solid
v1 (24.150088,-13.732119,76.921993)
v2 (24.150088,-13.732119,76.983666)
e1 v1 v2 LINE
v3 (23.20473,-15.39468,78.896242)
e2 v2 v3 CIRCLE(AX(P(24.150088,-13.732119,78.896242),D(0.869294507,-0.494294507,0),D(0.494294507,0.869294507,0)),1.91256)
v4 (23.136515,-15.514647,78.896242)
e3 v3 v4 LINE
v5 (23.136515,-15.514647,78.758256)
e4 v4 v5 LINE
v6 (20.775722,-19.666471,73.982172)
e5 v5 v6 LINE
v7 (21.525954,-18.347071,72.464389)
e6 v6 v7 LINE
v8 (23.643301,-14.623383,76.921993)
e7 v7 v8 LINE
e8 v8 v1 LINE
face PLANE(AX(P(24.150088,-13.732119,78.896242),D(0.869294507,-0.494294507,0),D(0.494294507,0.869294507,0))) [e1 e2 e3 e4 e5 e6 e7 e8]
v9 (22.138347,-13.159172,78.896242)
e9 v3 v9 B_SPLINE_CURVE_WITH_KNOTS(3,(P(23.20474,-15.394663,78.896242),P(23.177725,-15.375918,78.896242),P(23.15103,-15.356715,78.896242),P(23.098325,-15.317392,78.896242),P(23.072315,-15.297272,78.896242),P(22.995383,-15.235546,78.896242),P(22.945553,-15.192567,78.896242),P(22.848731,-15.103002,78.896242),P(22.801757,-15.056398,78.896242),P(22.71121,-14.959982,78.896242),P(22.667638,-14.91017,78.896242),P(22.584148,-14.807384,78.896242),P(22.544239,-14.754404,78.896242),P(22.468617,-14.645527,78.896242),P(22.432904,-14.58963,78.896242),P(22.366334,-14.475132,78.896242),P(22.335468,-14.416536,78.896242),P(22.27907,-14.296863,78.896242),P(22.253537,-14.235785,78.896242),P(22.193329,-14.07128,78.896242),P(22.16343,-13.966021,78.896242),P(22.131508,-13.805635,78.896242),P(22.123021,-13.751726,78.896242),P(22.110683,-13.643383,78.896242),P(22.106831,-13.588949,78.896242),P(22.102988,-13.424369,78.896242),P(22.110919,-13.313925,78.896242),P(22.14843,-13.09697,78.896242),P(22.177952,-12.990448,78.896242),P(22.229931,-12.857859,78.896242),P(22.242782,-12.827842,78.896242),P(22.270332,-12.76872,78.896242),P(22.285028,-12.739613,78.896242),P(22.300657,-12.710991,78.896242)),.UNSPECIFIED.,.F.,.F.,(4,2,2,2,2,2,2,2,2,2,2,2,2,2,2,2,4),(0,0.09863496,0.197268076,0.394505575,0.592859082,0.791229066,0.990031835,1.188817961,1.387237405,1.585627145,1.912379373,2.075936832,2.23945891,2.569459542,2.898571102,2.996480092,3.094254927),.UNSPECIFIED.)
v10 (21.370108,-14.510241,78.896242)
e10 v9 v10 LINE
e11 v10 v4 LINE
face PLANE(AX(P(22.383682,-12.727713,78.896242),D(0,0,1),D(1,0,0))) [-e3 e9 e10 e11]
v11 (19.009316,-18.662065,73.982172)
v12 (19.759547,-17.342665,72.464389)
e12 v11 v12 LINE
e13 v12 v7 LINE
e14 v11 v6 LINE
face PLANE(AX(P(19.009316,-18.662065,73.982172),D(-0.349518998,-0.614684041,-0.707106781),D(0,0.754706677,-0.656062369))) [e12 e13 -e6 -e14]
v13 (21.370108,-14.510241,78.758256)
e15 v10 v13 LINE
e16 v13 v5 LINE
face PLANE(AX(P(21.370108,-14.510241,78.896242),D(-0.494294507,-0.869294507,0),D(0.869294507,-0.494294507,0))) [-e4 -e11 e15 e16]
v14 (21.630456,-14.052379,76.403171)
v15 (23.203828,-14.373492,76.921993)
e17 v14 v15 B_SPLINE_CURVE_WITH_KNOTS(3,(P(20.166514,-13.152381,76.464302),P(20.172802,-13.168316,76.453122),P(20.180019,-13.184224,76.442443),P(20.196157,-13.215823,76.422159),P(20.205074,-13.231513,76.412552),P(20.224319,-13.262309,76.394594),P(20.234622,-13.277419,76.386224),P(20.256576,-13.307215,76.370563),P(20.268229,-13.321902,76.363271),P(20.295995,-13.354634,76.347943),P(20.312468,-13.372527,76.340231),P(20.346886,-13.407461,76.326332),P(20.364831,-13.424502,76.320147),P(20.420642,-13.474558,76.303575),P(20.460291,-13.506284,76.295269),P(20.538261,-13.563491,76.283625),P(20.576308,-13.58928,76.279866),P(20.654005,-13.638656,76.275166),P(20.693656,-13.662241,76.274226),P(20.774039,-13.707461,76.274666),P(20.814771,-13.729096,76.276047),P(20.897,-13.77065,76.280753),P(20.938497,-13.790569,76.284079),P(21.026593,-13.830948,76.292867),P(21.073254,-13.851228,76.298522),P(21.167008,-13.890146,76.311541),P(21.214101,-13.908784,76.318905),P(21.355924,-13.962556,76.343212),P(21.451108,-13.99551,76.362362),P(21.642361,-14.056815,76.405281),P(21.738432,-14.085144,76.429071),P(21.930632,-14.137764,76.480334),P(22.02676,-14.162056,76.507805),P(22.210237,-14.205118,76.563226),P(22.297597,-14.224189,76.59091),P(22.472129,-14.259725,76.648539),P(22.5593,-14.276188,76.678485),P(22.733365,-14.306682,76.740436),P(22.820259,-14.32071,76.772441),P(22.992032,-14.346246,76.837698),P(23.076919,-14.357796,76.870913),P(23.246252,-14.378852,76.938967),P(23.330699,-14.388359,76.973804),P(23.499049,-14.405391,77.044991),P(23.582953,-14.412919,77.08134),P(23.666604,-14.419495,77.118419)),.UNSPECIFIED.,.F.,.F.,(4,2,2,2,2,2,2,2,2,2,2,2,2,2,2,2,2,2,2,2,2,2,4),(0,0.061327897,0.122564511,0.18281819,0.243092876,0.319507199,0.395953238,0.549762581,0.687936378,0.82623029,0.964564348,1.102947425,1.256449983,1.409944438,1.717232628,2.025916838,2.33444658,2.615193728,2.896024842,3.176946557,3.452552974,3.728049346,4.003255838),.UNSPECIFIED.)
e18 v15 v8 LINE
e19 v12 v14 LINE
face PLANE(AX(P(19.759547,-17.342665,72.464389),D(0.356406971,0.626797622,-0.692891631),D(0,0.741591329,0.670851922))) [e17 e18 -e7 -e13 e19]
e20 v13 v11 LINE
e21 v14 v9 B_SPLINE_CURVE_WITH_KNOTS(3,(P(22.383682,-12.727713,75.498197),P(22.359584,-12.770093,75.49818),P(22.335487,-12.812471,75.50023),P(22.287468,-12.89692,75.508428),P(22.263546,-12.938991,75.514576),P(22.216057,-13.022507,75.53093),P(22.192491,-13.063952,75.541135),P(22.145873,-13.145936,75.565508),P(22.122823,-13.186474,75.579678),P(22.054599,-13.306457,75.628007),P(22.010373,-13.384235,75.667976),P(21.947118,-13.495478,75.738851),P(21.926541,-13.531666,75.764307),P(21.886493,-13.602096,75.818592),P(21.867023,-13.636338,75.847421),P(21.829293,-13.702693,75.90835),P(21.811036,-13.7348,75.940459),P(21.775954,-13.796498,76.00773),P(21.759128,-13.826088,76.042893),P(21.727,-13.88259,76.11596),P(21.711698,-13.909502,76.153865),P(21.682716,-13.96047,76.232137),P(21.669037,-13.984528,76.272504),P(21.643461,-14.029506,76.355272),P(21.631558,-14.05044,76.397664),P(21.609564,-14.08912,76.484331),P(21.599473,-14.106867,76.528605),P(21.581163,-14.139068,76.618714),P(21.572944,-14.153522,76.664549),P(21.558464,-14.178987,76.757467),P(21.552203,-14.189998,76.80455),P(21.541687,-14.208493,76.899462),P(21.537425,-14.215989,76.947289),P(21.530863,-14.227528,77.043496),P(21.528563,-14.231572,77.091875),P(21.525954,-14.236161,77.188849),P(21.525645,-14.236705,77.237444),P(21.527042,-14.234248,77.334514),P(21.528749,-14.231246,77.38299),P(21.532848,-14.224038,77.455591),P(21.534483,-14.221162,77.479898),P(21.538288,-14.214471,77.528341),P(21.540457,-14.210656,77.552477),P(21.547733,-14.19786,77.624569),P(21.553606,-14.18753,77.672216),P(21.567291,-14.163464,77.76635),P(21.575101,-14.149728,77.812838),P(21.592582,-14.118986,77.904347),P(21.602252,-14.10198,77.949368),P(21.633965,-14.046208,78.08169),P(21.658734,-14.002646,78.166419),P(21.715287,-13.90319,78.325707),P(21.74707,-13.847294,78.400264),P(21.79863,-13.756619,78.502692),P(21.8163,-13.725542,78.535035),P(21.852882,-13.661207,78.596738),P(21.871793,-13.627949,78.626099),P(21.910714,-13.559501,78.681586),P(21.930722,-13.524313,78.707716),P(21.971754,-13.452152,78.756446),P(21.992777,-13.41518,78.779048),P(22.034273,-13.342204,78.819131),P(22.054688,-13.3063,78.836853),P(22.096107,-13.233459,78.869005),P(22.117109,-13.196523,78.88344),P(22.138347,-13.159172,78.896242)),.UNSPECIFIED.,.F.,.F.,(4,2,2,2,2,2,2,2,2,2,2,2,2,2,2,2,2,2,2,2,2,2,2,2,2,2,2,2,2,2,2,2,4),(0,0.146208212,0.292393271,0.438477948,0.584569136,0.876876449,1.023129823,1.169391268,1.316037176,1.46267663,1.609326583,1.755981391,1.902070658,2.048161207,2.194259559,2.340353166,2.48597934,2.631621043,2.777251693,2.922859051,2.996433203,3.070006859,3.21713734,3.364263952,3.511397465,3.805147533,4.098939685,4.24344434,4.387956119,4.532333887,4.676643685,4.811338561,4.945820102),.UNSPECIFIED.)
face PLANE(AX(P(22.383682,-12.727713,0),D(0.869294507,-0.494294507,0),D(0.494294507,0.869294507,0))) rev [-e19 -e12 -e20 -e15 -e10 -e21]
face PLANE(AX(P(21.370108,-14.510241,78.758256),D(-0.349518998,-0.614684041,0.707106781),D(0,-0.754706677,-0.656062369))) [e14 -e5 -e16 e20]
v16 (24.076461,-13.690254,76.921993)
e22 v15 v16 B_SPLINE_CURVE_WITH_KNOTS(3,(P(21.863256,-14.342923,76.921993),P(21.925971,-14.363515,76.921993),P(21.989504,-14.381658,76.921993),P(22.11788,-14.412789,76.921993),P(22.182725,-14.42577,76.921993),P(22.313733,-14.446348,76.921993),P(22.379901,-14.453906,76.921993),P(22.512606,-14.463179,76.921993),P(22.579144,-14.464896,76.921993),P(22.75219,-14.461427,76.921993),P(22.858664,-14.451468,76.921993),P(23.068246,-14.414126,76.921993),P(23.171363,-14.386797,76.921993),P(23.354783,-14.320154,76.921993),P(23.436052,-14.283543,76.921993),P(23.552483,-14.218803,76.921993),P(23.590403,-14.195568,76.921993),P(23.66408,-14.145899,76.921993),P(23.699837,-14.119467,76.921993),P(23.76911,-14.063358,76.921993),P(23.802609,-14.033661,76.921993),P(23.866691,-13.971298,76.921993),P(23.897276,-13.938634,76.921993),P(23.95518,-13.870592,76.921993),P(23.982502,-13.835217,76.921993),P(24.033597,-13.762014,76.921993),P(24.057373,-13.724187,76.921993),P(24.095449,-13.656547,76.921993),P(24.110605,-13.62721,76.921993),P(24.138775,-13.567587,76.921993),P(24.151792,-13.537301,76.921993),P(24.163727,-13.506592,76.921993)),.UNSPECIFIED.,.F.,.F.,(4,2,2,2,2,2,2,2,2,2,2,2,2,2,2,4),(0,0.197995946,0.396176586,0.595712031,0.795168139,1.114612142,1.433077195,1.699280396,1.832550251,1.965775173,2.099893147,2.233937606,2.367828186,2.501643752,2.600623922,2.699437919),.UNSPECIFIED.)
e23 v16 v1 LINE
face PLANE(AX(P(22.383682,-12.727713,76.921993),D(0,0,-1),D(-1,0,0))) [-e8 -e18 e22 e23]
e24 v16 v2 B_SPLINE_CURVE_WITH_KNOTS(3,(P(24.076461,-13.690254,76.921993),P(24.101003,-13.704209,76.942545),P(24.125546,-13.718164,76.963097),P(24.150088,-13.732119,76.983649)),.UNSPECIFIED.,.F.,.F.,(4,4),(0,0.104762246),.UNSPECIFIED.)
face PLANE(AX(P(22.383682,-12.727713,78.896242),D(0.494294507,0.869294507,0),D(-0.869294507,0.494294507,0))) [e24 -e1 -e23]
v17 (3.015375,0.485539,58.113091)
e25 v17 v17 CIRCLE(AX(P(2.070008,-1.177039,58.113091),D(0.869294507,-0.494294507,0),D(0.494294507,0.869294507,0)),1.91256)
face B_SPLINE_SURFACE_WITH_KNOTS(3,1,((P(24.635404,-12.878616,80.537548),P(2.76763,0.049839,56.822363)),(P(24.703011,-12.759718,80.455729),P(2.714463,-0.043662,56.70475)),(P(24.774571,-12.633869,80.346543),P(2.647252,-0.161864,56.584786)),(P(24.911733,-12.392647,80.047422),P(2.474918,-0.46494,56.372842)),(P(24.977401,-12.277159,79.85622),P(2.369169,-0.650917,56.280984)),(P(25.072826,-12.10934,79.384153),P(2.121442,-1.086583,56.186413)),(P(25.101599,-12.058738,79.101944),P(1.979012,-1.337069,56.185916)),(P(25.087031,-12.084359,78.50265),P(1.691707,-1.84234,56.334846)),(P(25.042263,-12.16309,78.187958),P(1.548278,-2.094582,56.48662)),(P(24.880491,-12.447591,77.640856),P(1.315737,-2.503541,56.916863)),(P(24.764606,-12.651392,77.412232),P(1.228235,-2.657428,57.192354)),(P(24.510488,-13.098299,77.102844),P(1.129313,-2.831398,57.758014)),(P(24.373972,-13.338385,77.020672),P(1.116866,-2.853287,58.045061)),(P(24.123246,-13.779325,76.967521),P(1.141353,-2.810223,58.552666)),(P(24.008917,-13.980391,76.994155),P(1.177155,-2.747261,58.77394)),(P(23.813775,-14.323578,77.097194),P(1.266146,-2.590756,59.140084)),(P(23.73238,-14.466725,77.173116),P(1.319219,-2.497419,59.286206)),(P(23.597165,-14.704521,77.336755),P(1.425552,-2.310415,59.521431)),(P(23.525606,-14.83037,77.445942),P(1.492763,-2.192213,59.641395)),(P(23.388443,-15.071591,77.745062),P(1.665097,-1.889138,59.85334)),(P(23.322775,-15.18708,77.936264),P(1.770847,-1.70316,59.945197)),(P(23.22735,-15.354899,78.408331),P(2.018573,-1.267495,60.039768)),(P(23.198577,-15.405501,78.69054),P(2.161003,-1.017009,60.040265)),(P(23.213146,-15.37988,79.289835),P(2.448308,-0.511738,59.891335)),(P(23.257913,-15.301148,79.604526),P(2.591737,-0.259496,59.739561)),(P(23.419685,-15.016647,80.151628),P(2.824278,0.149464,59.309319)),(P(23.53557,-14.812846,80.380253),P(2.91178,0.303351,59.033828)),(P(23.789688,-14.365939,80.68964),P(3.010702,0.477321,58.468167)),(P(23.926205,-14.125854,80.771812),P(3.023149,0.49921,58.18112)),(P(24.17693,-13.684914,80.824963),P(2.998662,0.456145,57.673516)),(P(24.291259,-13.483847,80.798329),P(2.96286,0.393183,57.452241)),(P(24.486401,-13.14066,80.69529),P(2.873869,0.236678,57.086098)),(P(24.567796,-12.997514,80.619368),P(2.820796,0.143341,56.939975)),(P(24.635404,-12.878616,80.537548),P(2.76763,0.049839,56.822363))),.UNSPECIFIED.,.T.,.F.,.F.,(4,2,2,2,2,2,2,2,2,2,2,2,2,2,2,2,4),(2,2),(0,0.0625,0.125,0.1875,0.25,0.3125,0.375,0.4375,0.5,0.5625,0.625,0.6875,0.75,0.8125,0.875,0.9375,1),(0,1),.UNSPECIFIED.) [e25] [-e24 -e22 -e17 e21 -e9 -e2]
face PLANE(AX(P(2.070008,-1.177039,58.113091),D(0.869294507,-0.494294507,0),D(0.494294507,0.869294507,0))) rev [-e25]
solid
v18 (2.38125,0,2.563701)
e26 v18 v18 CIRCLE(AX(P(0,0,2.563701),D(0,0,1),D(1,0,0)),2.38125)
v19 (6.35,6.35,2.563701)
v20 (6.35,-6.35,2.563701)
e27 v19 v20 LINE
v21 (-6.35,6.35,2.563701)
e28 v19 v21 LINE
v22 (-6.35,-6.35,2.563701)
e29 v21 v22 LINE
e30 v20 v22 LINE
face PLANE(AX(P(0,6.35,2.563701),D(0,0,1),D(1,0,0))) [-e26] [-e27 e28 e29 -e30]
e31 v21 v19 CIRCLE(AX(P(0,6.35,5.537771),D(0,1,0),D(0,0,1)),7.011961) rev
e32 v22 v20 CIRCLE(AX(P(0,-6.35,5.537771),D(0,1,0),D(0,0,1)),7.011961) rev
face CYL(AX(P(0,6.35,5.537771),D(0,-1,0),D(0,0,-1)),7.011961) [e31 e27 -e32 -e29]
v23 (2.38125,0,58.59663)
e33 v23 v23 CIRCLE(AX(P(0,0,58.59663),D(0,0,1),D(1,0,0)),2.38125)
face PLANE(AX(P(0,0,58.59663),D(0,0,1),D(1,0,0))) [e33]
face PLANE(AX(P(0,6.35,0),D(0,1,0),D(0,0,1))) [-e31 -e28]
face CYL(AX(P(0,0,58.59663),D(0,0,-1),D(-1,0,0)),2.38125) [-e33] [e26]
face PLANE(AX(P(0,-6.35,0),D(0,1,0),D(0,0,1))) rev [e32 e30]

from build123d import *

# Parameters (mm, degrees)
SKETCH1_R           = 2.38125
BOSS_EXTRUDE1_DEPTH = 58.596630013
BOSS_EXTRUDE2_DEPTH = 6.35
BOSS_EXTRUDE4_DEPTH = 2.032


with BuildPart() as part:
    # Sketch1 → Boss-Extrude1 (new body)
    with BuildSketch(Plane.XY):
        Circle(SKETCH1_R)
    extrude(amount=BOSS_EXTRUDE1_DEPTH)

    # Sketch2 → Boss-Extrude2 (add, symmetric)
    with BuildSketch(Plane(origin=(0, 0, 0), x_dir=(1, 0, 0), z_dir=(0, 1, 0))):
        with BuildLine():
            Line((-6.35, -2.563701192), (0, -2.563701192))
            Line((0, -2.563701192), (6.35, -2.563701192))
            ThreePointArc((6.35, -2.563701192), (0, 1.474189404), (-6.35, -2.563701192))
        make_face()
    extrude(amount=BOSS_EXTRUDE2_DEPTH, both=True)


with BuildPart() as body_2:
    # Loft1: read off the stored shape, not the designer's step
    # Loft1: loft between two sections, ruled curve by curve
    loft1_from = [
        Edge.make_bspline([(24.635403527, -12.878615764, 80.537548375), (24.703010916, -12.759717555, 80.455728817), (24.77457053, -12.633868737, 80.346542629), (24.911732936, -12.392647108, 80.047422189), (24.977401408, -12.277158789, 79.856219839), (25.072825843, -12.109339936, 79.38415277), (25.101598912, -12.058737976, 79.101944057), (25.087030549, -12.08435873, 78.502649545), (25.042262607, -12.163090185, 78.187958466), (24.880490774, -12.447591356, 77.640856383), (24.76460641, -12.651392206, 77.412231552), (24.510487992, -13.098299348, 77.102844403), (24.373971523, -13.338384995, 77.020671771), (24.123246128, -13.779324972, 76.96752084), (24.008916688, -13.980391244, 76.994154883), (23.813775258, -14.323578092, 77.097193937), (23.732379916, -14.466724581, 77.173116318), (23.597165139, -14.704520999, 77.336755435), (23.525605524, -14.830369818, 77.445941623), (23.388443119, -15.071591446, 77.745062063), (23.322774646, -15.187079766, 77.936264413), (23.227350212, -15.354898618, 78.408331482), (23.198577142, -15.405500579, 78.690540195), (23.213145506, -15.379879824, 79.289834707), (23.257913447, -15.30114837, 79.604525786), (23.41968528, -15.016647199, 80.151627869), (23.535569644, -14.812846348, 80.3802527), (23.789688063, -14.365939206, 80.689639849), (23.926204532, -14.125853559, 80.771812481), (24.176929926, -13.684913583, 80.824963412), (24.291259366, -13.483847311, 80.798329369), (24.486400797, -13.140660463, 80.695290315), (24.567796138, -12.997513973, 80.619367934), (24.635403527, -12.878615764, 80.537548375)], [0, 0, 0, 0, 0.0625, 0.0625, 0.125, 0.125, 0.1875, 0.1875, 0.25, 0.25, 0.3125, 0.3125, 0.375, 0.375, 0.4375, 0.4375, 0.5, 0.5, 0.5625, 0.5625, 0.625, 0.625, 0.6875, 0.6875, 0.75, 0.75, 0.8125, 0.8125, 0.875, 0.875, 0.9375, 0.9375, 1, 1, 1, 1], 3),
    ]
    loft1_to = [
        Edge.make_bspline([(2.767629763, 0.049839418, 56.82236264), (2.714463118, -0.043662476, 56.704750196), (2.64725177, -0.161864184, 56.584786377), (2.474918122, -0.464939965, 56.372841519), (2.369168557, -0.65091718, 56.28098433), (2.12144239, -1.086582543, 56.186412949), (1.979011826, -1.337069056, 56.185916163), (1.691706982, -1.842339737, 56.334845804), (1.548278172, -2.094581822, 56.486619954), (1.315737433, -2.503541227, 56.916862609), (1.228234782, -2.657428378, 57.192353655), (1.129312793, -2.83139823, 57.758013891), (1.116866397, -2.853287171, 58.045061216), (1.141353454, -2.810222836, 58.552665546), (1.177154765, -2.747260609, 58.773939726), (1.266145812, -2.590755879, 59.140083551), (1.319218682, -2.497418903, 59.286206124), (1.425551973, -2.310415115, 59.521431011), (1.49276332, -2.192213406, 59.64139483), (1.665096968, -1.889137626, 59.853339688), (1.770846533, -1.70316041, 59.945196877), (2.0185727, -1.267495047, 60.039768258), (2.161003265, -1.017008534, 60.040265044), (2.448308108, -0.511737853, 59.891335404), (2.591736918, -0.259495768, 59.739561253), (2.824277658, 0.149463636, 59.309318598), (2.911780308, 0.303350787, 59.033827552), (3.010702298, 0.477320639, 58.468167316), (3.023148693, 0.49920958, 58.181119991), (2.998661636, 0.456145246, 57.673515661), (2.962860325, 0.393183019, 57.452241481), (2.873869279, 0.236678289, 57.086097656), (2.820796408, 0.143341312, 56.939975083), (2.767629763, 0.049839418, 56.82236264)], [0, 0, 0, 0, 0.0625, 0.0625, 0.125, 0.125, 0.1875, 0.1875, 0.25, 0.25, 0.3125, 0.3125, 0.375, 0.375, 0.4375, 0.4375, 0.5, 0.5, 0.5625, 0.5625, 0.625, 0.625, 0.6875, 0.6875, 0.75, 0.75, 0.8125, 0.8125, 0.875, 0.875, 0.9375, 0.9375, 1, 1, 1, 1], 3),
    ]
    loft1 = Solid(Shell([*[Face.make_surface_from_curves(loft1_from[k], loft1_to[k]) for k in range(1)], Face(Wire(loft1_from)), Face(Wire(loft1_to))]))
    add(loft1)

    # Sketch8 → Boss-Extrude4 (add)
    with BuildSketch(Plane(origin=(24.150088027, -13.732119277, 0), x_dir=(0, 0, -1), z_dir=(0.869294507164732, -0.49429450716473244, 0))):
        Polygon((-78.75825642, -2.050545662), (-73.982171856, -6.826630226), (-72.464389408, -5.308847777), (-76.921993148, -1.025272831), (-76.921993148, 0), (-78.896242126, 0), (-78.896242126, -2.050545662), align=None)
    extrude(amount=-BOSS_EXTRUDE4_DEPTH)


solid = Compound([part.part, body_2.part])
